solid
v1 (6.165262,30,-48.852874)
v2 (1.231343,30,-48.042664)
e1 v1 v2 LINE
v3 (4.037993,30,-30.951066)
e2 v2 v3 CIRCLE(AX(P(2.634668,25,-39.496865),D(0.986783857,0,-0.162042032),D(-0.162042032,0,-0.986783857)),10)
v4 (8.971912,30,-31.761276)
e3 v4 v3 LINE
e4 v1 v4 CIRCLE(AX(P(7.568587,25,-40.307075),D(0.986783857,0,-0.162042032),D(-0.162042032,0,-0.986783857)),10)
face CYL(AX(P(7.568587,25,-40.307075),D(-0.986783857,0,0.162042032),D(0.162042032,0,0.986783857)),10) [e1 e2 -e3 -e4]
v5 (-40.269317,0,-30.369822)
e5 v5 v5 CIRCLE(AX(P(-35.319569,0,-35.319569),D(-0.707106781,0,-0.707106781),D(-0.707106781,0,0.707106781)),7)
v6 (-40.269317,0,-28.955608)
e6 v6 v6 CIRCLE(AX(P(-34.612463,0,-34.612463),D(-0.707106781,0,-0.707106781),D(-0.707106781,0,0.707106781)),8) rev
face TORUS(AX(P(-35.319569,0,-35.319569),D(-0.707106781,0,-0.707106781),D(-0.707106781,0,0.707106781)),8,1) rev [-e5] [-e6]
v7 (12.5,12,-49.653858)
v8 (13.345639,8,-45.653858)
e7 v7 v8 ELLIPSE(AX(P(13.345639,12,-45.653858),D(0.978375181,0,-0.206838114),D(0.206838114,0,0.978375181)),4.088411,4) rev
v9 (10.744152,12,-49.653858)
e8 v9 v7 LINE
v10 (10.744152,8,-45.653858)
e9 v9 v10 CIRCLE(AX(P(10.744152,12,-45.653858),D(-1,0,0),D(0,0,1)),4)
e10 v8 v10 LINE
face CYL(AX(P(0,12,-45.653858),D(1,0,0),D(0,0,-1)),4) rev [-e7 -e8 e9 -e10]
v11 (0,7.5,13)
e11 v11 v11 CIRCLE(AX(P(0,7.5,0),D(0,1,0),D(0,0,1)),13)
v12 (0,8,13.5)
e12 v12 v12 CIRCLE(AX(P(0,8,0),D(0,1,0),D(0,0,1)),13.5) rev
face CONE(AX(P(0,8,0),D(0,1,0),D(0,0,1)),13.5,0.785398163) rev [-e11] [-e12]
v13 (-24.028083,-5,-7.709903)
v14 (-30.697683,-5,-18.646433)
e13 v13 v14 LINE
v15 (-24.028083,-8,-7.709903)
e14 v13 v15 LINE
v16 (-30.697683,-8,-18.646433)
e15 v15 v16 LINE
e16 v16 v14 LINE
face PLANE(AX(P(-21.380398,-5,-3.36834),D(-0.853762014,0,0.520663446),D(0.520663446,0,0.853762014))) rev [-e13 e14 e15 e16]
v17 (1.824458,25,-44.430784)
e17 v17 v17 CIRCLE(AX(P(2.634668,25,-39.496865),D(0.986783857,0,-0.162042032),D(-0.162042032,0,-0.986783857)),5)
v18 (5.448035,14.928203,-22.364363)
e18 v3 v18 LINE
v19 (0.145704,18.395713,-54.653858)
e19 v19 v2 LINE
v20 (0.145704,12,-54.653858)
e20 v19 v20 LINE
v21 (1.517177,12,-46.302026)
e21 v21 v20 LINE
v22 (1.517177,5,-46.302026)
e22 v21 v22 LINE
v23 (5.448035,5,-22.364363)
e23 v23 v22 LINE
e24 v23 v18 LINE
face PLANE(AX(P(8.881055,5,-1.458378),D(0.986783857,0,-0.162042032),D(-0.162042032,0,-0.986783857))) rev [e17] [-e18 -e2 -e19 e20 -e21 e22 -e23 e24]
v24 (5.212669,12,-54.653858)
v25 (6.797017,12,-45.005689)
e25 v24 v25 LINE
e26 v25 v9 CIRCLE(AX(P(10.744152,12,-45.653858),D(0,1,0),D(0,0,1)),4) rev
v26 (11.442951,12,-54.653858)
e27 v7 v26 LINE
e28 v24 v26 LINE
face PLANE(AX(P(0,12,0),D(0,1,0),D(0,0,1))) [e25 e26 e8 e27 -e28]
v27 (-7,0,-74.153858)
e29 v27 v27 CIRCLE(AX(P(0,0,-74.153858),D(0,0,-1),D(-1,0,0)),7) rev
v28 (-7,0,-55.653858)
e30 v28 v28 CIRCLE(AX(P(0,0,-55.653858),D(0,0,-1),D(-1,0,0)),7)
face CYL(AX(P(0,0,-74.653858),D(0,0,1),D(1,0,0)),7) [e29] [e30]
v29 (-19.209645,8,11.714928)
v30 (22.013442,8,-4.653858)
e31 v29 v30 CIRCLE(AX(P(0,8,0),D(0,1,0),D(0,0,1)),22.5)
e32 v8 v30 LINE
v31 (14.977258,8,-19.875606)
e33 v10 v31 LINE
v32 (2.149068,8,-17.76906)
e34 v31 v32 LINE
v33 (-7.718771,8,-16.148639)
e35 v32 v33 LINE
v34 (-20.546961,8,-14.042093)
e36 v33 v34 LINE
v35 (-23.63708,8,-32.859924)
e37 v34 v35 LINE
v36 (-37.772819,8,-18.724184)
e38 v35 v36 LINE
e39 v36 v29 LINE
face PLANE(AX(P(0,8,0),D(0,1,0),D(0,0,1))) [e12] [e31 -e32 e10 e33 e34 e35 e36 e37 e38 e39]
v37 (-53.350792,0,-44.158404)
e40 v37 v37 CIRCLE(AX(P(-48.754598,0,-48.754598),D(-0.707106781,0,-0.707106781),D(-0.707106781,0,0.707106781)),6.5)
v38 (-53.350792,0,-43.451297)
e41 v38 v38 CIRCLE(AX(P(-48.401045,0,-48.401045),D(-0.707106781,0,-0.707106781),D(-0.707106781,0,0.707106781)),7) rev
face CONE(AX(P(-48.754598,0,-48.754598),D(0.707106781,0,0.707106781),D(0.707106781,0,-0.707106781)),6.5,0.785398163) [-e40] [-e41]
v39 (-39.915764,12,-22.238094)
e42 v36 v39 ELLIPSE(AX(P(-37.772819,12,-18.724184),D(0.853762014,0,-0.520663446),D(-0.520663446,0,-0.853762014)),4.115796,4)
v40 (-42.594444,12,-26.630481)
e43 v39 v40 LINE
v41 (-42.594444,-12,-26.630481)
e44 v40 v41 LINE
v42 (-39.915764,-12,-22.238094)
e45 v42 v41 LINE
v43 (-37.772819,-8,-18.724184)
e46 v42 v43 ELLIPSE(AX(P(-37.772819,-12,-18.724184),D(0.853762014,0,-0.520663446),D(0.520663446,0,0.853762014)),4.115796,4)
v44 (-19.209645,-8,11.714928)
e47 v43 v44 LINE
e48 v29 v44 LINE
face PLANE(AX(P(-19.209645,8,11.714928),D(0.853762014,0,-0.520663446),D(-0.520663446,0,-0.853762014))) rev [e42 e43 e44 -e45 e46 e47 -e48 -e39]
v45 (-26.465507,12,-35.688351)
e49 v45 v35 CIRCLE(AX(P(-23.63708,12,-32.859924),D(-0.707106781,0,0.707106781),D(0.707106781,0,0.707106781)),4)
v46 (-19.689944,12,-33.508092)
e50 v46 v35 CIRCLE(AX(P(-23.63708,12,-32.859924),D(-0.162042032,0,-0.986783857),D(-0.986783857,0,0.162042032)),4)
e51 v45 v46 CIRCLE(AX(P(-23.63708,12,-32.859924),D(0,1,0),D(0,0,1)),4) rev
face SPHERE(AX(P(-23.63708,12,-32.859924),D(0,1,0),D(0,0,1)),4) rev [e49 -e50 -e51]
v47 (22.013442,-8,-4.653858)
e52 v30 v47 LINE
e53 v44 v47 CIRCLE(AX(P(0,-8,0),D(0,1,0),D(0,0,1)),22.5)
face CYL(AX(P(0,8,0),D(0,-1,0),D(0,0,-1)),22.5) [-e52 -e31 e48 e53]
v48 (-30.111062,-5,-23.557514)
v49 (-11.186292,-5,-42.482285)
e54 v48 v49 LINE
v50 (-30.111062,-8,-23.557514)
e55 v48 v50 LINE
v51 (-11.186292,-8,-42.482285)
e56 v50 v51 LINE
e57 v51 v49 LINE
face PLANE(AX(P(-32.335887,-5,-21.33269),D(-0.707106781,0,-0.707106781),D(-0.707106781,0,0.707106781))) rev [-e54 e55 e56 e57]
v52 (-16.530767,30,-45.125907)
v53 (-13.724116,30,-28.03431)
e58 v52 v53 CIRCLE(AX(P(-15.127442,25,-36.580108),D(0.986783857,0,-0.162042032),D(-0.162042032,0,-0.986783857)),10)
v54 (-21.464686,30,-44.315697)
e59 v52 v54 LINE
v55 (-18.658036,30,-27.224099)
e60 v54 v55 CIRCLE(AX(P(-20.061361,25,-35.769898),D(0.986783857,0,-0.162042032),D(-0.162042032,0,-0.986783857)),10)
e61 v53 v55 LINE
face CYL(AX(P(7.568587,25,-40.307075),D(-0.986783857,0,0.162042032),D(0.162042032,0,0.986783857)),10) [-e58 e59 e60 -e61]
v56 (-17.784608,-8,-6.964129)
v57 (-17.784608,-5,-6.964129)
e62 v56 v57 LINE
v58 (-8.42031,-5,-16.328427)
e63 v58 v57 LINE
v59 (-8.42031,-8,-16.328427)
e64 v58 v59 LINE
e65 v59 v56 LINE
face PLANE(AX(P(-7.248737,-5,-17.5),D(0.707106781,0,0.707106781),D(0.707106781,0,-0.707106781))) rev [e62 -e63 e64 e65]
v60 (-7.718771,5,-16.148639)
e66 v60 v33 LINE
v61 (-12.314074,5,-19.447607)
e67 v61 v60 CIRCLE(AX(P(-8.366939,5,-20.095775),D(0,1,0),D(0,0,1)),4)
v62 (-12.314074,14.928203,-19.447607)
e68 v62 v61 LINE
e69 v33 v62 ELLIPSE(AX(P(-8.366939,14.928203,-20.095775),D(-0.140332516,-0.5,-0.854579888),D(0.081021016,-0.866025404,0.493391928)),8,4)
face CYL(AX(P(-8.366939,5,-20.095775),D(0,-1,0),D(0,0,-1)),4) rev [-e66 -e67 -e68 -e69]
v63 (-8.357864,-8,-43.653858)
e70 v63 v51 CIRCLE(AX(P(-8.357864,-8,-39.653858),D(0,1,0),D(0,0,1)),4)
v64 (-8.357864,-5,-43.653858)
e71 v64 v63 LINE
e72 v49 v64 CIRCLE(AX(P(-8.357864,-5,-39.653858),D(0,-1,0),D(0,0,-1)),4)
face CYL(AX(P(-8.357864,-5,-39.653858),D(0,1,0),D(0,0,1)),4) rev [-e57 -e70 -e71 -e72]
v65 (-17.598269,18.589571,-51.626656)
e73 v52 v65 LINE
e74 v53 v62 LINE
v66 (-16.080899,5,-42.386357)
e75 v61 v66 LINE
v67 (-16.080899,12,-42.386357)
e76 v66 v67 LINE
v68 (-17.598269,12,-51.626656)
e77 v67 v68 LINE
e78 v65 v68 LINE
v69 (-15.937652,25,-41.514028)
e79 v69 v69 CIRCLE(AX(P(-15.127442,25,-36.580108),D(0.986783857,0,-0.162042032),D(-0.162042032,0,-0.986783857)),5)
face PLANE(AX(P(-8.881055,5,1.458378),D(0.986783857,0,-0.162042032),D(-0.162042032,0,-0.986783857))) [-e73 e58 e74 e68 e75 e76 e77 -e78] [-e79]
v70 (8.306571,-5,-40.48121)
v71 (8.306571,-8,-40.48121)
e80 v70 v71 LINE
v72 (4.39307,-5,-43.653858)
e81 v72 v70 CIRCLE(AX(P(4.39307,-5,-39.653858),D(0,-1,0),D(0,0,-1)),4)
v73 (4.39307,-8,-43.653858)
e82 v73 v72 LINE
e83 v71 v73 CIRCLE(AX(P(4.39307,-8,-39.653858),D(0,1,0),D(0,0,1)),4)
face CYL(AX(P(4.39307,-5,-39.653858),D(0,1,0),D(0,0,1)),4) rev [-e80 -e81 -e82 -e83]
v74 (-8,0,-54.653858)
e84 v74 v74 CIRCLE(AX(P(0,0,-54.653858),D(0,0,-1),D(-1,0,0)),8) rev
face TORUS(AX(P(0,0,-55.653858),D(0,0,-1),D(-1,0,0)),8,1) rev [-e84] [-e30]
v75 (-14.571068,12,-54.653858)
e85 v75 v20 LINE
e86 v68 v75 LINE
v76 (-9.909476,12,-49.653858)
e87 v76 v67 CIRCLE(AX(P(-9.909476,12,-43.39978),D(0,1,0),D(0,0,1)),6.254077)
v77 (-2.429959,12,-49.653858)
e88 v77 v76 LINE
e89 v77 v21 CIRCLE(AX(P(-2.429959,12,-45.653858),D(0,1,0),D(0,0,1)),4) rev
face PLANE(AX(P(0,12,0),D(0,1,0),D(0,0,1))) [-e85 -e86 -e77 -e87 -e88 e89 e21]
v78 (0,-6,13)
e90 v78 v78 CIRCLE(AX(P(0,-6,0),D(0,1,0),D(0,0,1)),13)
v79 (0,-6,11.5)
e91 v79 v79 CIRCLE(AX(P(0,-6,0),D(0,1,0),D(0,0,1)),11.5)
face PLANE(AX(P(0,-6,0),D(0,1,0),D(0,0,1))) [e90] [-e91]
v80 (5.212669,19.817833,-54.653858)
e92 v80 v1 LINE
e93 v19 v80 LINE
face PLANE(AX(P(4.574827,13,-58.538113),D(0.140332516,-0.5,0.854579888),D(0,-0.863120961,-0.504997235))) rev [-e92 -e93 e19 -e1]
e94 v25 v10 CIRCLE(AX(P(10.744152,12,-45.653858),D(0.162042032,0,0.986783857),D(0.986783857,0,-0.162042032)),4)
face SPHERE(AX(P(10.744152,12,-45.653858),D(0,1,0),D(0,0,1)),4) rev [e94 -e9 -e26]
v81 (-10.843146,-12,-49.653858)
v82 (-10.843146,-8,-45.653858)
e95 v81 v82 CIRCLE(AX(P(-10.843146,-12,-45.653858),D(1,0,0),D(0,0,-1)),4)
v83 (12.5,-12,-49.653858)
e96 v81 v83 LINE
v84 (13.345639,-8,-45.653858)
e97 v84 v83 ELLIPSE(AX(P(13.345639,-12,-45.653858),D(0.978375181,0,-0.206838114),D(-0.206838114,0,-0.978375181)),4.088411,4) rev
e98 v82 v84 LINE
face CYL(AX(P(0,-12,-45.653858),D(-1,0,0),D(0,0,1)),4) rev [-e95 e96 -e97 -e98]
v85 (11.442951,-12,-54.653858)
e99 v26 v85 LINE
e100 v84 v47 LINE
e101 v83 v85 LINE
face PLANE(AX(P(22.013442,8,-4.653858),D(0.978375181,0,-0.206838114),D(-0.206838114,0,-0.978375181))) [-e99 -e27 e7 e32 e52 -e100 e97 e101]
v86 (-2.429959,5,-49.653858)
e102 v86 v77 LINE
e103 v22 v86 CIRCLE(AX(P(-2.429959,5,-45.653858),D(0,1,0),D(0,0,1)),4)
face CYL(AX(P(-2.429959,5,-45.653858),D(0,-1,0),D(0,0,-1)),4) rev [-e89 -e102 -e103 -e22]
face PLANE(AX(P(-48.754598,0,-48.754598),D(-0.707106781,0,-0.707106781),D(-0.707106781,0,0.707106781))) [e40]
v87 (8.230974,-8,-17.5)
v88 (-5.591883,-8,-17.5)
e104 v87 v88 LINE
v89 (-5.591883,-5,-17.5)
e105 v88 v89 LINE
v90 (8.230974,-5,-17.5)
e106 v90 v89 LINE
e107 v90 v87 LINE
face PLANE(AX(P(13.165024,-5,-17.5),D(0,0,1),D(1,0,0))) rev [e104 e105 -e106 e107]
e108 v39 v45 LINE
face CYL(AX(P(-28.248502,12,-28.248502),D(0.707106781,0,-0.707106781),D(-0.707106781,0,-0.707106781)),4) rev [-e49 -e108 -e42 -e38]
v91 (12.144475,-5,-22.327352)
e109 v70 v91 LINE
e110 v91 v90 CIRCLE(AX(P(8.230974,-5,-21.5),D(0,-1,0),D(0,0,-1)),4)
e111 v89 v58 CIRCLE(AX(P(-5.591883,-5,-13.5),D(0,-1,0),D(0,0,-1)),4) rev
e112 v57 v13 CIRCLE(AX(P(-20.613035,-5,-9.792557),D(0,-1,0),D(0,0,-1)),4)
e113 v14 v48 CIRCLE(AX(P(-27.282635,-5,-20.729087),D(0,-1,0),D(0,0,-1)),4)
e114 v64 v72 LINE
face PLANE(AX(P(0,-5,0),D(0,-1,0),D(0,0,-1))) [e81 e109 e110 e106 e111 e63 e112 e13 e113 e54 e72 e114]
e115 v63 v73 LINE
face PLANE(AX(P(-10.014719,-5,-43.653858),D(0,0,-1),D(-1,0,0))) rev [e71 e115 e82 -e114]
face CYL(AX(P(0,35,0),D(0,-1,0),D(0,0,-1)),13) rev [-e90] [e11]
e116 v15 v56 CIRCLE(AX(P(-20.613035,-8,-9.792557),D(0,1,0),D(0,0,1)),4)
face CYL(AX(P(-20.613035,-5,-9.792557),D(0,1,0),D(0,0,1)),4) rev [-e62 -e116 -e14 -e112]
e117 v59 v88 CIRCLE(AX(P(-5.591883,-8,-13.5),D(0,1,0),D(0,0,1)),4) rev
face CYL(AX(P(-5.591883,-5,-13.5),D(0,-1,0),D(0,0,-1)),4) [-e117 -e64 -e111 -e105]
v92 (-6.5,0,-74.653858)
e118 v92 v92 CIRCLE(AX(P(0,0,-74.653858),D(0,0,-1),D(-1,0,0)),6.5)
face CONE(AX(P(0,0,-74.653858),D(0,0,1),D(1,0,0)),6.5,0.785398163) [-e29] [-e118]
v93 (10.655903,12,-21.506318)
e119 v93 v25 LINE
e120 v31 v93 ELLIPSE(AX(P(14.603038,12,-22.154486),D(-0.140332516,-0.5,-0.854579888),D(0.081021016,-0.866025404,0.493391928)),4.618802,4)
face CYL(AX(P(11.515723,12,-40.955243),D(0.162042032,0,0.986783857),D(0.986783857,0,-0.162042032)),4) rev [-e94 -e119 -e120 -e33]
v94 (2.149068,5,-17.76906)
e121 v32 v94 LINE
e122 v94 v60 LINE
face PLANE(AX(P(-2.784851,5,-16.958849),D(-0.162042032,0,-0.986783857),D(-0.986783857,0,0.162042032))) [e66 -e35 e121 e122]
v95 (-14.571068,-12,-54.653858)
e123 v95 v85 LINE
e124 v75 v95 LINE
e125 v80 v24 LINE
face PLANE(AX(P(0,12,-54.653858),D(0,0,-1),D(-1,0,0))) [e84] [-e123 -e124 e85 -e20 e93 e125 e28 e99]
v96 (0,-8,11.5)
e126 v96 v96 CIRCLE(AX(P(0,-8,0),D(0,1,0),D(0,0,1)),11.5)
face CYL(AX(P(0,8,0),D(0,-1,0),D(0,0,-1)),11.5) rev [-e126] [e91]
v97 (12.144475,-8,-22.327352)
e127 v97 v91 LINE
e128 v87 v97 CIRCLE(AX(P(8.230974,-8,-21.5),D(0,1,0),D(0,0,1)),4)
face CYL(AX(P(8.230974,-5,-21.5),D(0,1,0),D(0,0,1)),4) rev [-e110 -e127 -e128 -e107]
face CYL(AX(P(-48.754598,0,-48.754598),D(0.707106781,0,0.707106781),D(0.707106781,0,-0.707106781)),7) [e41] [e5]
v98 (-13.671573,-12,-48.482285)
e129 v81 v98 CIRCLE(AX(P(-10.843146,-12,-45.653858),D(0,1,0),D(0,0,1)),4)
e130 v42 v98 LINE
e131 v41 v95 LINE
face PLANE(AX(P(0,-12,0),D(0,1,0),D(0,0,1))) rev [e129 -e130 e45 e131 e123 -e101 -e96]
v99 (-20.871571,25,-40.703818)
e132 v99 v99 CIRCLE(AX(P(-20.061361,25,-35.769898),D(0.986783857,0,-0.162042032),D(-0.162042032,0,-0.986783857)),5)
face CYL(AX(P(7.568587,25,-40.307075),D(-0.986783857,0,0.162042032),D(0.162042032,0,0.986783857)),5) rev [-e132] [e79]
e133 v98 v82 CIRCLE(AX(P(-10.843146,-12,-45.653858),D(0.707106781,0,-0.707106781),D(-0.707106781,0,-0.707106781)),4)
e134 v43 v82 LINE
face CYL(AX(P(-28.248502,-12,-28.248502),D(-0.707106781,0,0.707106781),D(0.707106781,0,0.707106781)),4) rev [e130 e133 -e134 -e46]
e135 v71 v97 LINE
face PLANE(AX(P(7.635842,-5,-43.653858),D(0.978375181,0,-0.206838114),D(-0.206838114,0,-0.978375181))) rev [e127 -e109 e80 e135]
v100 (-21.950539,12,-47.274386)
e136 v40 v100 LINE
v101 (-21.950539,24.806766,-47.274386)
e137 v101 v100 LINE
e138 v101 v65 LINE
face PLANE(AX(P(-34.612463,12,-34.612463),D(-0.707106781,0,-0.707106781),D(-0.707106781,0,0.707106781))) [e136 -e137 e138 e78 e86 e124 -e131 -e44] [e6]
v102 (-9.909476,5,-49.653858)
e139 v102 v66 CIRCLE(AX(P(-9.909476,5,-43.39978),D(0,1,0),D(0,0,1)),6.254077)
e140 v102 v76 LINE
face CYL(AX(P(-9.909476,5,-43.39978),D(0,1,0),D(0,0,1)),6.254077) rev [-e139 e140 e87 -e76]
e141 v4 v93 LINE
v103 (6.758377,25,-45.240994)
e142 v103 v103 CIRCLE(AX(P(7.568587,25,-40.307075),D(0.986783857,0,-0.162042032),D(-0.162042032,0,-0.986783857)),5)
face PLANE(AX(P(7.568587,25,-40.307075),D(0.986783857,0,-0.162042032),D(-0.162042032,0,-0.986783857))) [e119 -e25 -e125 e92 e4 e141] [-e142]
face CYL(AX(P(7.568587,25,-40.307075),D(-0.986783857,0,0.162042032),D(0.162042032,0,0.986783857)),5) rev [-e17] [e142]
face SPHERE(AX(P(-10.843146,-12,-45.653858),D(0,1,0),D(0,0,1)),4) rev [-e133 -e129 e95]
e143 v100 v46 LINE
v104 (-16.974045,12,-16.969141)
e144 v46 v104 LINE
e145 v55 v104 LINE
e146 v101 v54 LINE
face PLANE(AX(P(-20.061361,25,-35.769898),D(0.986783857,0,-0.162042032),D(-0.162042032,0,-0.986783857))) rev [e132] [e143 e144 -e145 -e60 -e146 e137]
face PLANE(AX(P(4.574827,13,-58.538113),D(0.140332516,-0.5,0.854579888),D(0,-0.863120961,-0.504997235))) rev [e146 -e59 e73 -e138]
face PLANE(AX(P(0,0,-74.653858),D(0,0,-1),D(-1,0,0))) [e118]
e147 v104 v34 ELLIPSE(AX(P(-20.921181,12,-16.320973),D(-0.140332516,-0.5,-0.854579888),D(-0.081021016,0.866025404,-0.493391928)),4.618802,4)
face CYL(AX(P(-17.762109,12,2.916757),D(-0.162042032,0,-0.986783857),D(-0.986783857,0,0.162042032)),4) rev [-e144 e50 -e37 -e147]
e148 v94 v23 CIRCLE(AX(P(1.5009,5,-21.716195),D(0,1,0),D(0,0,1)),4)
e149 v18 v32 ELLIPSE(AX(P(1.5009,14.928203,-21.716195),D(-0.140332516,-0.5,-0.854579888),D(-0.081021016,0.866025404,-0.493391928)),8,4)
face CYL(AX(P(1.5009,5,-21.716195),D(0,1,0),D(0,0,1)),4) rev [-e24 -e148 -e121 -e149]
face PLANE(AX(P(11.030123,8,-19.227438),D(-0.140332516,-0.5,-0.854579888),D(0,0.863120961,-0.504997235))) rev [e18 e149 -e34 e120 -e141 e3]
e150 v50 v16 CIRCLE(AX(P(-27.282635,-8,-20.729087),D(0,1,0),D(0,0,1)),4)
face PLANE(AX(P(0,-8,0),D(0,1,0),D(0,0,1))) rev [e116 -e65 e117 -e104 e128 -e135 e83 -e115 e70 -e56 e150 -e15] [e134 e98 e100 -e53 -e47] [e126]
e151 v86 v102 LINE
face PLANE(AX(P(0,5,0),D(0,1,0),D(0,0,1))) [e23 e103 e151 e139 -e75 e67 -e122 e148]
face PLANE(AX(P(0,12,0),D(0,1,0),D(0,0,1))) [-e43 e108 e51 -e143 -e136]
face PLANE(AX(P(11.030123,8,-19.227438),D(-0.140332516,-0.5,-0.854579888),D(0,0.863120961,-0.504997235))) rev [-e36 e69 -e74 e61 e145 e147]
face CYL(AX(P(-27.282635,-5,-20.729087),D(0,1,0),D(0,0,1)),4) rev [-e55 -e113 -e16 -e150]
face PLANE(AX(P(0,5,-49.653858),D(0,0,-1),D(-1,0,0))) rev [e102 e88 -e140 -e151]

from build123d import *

# Parameters (mm, degrees)
SZKIC1_R                        = 13
SZKIC1_R_2                      = 11.5
DODANIE_WYCI_GNI_CIE1_DEPTH     = 8
SZKIC2_R                        = 5.0000000000000036
DODANIE_WYCI_GNI_CIE2_DEPTH     = 14
DODANIE_WYCI_GNI_CIE3_DEPTH     = 12
WYTNIJ_WYCI_GNI_CIE1_DEPTH      = 81.41142519817177
WYTNIJ_WYCI_GNI_CIE1_DEPTH_BACK = 6
SZKIC1_3_R                      = 13
SZKIC1_3_R_2                    = 11.5
WYTNIJ_WYCI_GNI_CIE2_DEPTH      = 78.26575763170368
WYTNIJ_WYCI_GNI_CIE2_DEPTH_BACK = 3
WYTNIJ_WYCI_GNI_CIE3_START      = 4
WYTNIJ_WYCI_GNI_CIE3_DEPTH      = 74.265757666648
WYTNIJ_WYCI_GNI_CIE4_DEPTH      = 78.26575763170368
SZKIC4_R                        = 7
DODANIE_WYCI_GNI_CIE4_DEPTH     = 20
SZKIC5_R                        = 7
DODANIE_WYCI_GNI_CIE5_DEPTH     = 20
WYTNIJ_WYCI_GNI_CIE5_DEPTH      = 3
ZAOKR_GLENIE1_R                 = 4
ZAOKR_GLENIE2_R                 = 4
ZAOKR_GLENIE3_R                 = 1
SFAZOWANIE1_SIZE                = 0.5


with BuildPart() as part:
    # Szkic1 → Dodanie-wyciągnięcie1 (new, symmetric)
    # profile 1 of 2: a face of its own
    with BuildSketch(Plane(origin=(0, 0, 0), x_dir=(1, 0, 0), z_dir=(0, 1, 0))):
        with BuildLine():
            Line((-39.9157635445463, 22.238094014882595), (-19.20964530804123, -11.714927534528307))
            ThreePointArc((-19.20964530804123, -11.714927534528307), (8.303589569253562, -20.911728772757726), (22.01344157137967, 4.653857559428904))
            Line((22.01344157137967, 4.653857559428904), (12.499999999999995, 49.6538575594289))
            Line((12.499999999999995, 49.6538575594289), (-12.499999999999995, 49.6538575594289))
            Line((-12.499999999999995, 49.6538575594289), (-39.9157635445463, 22.238094014882595))
        make_face()
        Circle(SZKIC1_R, mode=Mode.SUBTRACT)
    # profile 2 of 2: a face of its own
    with BuildSketch(Plane(origin=(0, 0, 0), x_dir=(1, 0, 0), z_dir=(0, 1, 0))):
        Circle(SZKIC1_R)
        with Locations(Location((0, 0, 0), (0, 0, 270))):
            Circle(SZKIC1_R_2, mode=Mode.SUBTRACT)
    extrude(amount=DODANIE_WYCI_GNI_CIE1_DEPTH, both=True)

    # Szkic2 → Dodanie-wyciągnięcie2 (add, symmetric)
    with BuildSketch(Plane(origin=(0, 0, 0), x_dir=(-0.16204203158770583, 0, -0.9867838567786408), z_dir=(0.9867838567786409, 0, -0.16204203158770586))):
        with BuildLine():
            Line((17.185981887192586, 8), (29.887687809364394, 30.00000000000001))
            ThreePointArc((29.887687809364394, 30.00000000000001), (38.54794184720877, 35), (47.20819588505315, 30.000000000000014))
            Line((47.20819588505315, 30.000000000000014), (57.02315046127683, 13.000000000000002))
            Line((57.02315046127683, 13.000000000000002), (57.02315046127683, 8))
            Line((57.02315046127683, 8), (17.185981887192586, 8))
        make_face()
        with Locations((38.54794184720877, 25)):
            Circle(SZKIC2_R, mode=Mode.SUBTRACT)
    extrude(amount=DODANIE_WYCI_GNI_CIE2_DEPTH, both=True)

    # Szkic1<5> → Dodanie-wyciągnięcie3 (add, symmetric)
    with BuildSketch(Plane(origin=(0, 0, 0), x_dir=(1, 0, 0), z_dir=(0, 1, 0))):
        Polygon((-12.499999999999995, 49.6538575594289), (12.499999999999995, 49.6538575594289), (11.442950936513364, 54.6538575594289), (-14.571067811865477, 54.6538575594289), (-42.59444393988905, 26.630481431405318), (-39.9157635445463, 22.238094014882595), align=None)
    extrude(amount=DODANIE_WYCI_GNI_CIE3_DEPTH, both=True)

    # Szkic1<3> → Wytnij-wyciągnięcie1 (cut, two sides: drawn at the far end of the back side and taken through both)
    with BuildSketch(Plane(origin=(0, 0, 0), x_dir=(1, 0, 0), z_dir=(0, 1, 0)).offset(-WYTNIJ_WYCI_GNI_CIE1_DEPTH_BACK)):
        with Locations(Location((0, 0, 0), (0, 0, 270))):
            Circle(SZKIC1_3_R)
        with Locations(Location((0, 0, 0), (0, 0, 270))):
            Circle(SZKIC1_3_R_2, mode=Mode.SUBTRACT)
    extrude(amount=WYTNIJ_WYCI_GNI_CIE1_DEPTH + WYTNIJ_WYCI_GNI_CIE1_DEPTH_BACK, mode=Mode.SUBTRACT)

    # Szkic3 → Wytnij-wyciągnięcie2 (cut, two sides: drawn at the far end of the back side and taken through both)
    with BuildSketch(Plane(origin=(0, 8, 0), x_dir=(1, 0, 0), z_dir=(0, 1, 0)).offset(-WYTNIJ_WYCI_GNI_CIE2_DEPTH_BACK)):
        with BuildLine():
            Line((-16.080898850750692, 42.386356929210905), (-11.665906130837973, 15.500471204882405))
            Line((-11.665906130837973, 15.500471204882405), (6.096203291177561, 18.417227773461114))
            Line((6.096203291177559, 18.417227773461114), (0.9667649489300167, 49.6538575594289))
            Line((0.9667649489300163, 49.6538575594289), (-9.9094763840183, 49.6538575594289))
            ThreePointArc((-9.9094763840183, 49.6538575594289), (-14.676630164659013, 47.44795607994614), (-16.080898850750696, 42.386356929210905))
        make_face()
    extrude(amount=WYTNIJ_WYCI_GNI_CIE2_DEPTH + WYTNIJ_WYCI_GNI_CIE2_DEPTH_BACK, mode=Mode.SUBTRACT)

    # Szkic3<3> → Wytnij-wyciągnięcie3 (cut, through all)
    with BuildSketch(Plane(origin=(0, 8, 0), x_dir=(1, 0, 0), z_dir=(0, 1, 0)).offset(WYTNIJ_WYCI_GNI_CIE3_START)):
        with BuildLine():
            ThreePointArc((-16.080898850750696, 42.386356929210905), (-14.676630164659013, 47.44795607994614), (-9.9094763840183, 49.6538575594289))
            Line((-9.9094763840183, 49.6538575594289), (0.9667649489300167, 49.6538575594289))
            Line((0.9667649489300163, 49.6538575594289), (0.14570352562758648, 54.6538575594289))
            Line((0.14570352562758646, 54.6538575594289), (-14.571067811865477, 54.65385755942889))
            Line((-14.571067811865477, 54.65385755942889), (-17.59826945789091, 51.626655913403454))
            Line((-17.59826945789091, 51.626655913403454), (-16.080898850750696, 42.386356929210905))
        make_face()
    extrude(amount=WYTNIJ_WYCI_GNI_CIE3_DEPTH, mode=Mode.SUBTRACT)

    # Szkic3<4> → Wytnij-wyciągnięcie4 (cut, through all)
    with BuildSketch(Plane(origin=(0, 8, 0), x_dir=(1, 0, 0), z_dir=(0, 1, 0))):
        Polygon((-9.240147148276744, 56.26952433784747), (-8.97483481534258, 54.65385755942888), (0.14570352562758693, 54.6538575594289), (5.212669270611022, 54.6538575594289), (4.5748268466242505, 58.53811278007535), align=None)
        Polygon((-14.571067811865477, 54.65385755942889), (-8.974834815342582, 54.65385755942889), (-9.240147148276744, 56.26952433784747), (-23.055121143177697, 54.00093589561959), (-21.95053906691765, 47.274386304376705), (-17.59826945789091, 51.626655913403454), align=None)
    extrude(amount=WYTNIJ_WYCI_GNI_CIE4_DEPTH, mode=Mode.SUBTRACT)

    # Szkic4 → Dodanie-wyciągnięcie4 (add)
    with BuildSketch(Plane(origin=(0, 0, -54.6538575594289), x_dir=(-1, 0, 0), z_dir=(0, 0, -1))):
        Circle(SZKIC4_R)
    extrude(amount=DODANIE_WYCI_GNI_CIE4_DEPTH)

    # Szkic5 → Dodanie-wyciągnięcie5 (add)
    with BuildSketch(Plane(origin=(-34.6124626856472, 0, -34.61246268564717), x_dir=(-0.7071067811865475, 0, 0.7071067811865477), z_dir=(-0.7071067811865477, 0, -0.7071067811865475))):
        Circle(SZKIC5_R)
    extrude(amount=DODANIE_WYCI_GNI_CIE5_DEPTH)

    # Szkic6 → Wytnij-wyciągnięcie5 (cut)
    with BuildSketch(Plane.XZ.offset(8)):
        Polygon((7.635842149160336, -43.65385755942889), (13.165024277111744, -17.499999999999996), (-7.248737341529154, -17.5), (-21.380397649888803, -3.3683396916403576), (-32.335886609702584, -21.332689575487763), (-10.01471862576144, -43.65385755942889), align=None)
    extrude(amount=-WYTNIJ_WYCI_GNI_CIE5_DEPTH, mode=Mode.SUBTRACT)

    # Zaokrąglenie1
    zaokr_glenie1_edges = [part.edges().sort_by_distance(p)[0] for p in [
        (7.635842149160336, -6.5, -43.65385755942889),
        (-10.01471862576144, -6.5, -43.65385755942889),
        (-32.335886609702584, -6.5, -21.332689575487763),
        (-21.380397649888803, -6.5, -3.3683396916403576),
        (-7.248737341529154, -6.5, -17.5),
        (13.165024277111744, -6.5, -17.499999999999996),
        (-12.499999999999995, -10, -49.6538575594289),
        (6.033730693913451, 10, -49.6538575594289),
        (-20.953164090141588, 10, -41.20069346928731),
        (6.09620329117756, 6.5, -18.417227773461114),
        (0.9667649489300165, 8.5, -49.6538575594289),
        (-11.665906130837973, 6.5, -15.500471204882405),
    ]]
    fillet(zaokr_glenie1_edges, radius=ZAOKR_GLENIE1_R)

    # Zaokrąglenie2
    zaokr_glenie2_edges = [part.edges().sort_by_distance(p)[0] for p in [
        (-18.144884891779377, 8, -24.099176343644537),
        (-22.41182088800963, 8, -36.667644697134236),
        (-33.19063523261732, 8, -28.96322232681158),
        (11.622076214271065, 8, -49.6538575594289),
        (8.91356978824917, 8, -32.11656368223886),
        (7.695163046353066, 8, -48.2430009983481),
        (-26.793668209900048, -8, -35.360189349528845),
        (-12.373879479967972, -8, -49.34937568947405),
        (0.8284271247461916, -8, -49.6538575594289),
    ]]
    fillet(zaokr_glenie2_edges, radius=ZAOKR_GLENIE2_R - 0.0001)  # a hair under: the kernel refuses the full size

    # Zaokrąglenie3
    zaokr_glenie3_edges = [part.edges().sort_by_distance(p)[0] for p in [
        (7, 8.6e-16, -54.6538575594289),
        (-29.66271521734136, 8.6e-16, -39.56221015395302),
    ]]
    fillet(zaokr_glenie3_edges, radius=ZAOKR_GLENIE3_R)

    # Sfazowanie1
    sfazowanie1_edges = [part.edges().sort_by_distance(p)[0] for p in [
        (7, 8.6e-16, -74.6538575594289),
        (-43.804850841072316, 8.6e-16, -53.70434577768397),
        (6.57e-15, 8, -13),
    ]]
    chamfer(sfazowanie1_edges, length=SFAZOWANIE1_SIZE)


solid = part.part
